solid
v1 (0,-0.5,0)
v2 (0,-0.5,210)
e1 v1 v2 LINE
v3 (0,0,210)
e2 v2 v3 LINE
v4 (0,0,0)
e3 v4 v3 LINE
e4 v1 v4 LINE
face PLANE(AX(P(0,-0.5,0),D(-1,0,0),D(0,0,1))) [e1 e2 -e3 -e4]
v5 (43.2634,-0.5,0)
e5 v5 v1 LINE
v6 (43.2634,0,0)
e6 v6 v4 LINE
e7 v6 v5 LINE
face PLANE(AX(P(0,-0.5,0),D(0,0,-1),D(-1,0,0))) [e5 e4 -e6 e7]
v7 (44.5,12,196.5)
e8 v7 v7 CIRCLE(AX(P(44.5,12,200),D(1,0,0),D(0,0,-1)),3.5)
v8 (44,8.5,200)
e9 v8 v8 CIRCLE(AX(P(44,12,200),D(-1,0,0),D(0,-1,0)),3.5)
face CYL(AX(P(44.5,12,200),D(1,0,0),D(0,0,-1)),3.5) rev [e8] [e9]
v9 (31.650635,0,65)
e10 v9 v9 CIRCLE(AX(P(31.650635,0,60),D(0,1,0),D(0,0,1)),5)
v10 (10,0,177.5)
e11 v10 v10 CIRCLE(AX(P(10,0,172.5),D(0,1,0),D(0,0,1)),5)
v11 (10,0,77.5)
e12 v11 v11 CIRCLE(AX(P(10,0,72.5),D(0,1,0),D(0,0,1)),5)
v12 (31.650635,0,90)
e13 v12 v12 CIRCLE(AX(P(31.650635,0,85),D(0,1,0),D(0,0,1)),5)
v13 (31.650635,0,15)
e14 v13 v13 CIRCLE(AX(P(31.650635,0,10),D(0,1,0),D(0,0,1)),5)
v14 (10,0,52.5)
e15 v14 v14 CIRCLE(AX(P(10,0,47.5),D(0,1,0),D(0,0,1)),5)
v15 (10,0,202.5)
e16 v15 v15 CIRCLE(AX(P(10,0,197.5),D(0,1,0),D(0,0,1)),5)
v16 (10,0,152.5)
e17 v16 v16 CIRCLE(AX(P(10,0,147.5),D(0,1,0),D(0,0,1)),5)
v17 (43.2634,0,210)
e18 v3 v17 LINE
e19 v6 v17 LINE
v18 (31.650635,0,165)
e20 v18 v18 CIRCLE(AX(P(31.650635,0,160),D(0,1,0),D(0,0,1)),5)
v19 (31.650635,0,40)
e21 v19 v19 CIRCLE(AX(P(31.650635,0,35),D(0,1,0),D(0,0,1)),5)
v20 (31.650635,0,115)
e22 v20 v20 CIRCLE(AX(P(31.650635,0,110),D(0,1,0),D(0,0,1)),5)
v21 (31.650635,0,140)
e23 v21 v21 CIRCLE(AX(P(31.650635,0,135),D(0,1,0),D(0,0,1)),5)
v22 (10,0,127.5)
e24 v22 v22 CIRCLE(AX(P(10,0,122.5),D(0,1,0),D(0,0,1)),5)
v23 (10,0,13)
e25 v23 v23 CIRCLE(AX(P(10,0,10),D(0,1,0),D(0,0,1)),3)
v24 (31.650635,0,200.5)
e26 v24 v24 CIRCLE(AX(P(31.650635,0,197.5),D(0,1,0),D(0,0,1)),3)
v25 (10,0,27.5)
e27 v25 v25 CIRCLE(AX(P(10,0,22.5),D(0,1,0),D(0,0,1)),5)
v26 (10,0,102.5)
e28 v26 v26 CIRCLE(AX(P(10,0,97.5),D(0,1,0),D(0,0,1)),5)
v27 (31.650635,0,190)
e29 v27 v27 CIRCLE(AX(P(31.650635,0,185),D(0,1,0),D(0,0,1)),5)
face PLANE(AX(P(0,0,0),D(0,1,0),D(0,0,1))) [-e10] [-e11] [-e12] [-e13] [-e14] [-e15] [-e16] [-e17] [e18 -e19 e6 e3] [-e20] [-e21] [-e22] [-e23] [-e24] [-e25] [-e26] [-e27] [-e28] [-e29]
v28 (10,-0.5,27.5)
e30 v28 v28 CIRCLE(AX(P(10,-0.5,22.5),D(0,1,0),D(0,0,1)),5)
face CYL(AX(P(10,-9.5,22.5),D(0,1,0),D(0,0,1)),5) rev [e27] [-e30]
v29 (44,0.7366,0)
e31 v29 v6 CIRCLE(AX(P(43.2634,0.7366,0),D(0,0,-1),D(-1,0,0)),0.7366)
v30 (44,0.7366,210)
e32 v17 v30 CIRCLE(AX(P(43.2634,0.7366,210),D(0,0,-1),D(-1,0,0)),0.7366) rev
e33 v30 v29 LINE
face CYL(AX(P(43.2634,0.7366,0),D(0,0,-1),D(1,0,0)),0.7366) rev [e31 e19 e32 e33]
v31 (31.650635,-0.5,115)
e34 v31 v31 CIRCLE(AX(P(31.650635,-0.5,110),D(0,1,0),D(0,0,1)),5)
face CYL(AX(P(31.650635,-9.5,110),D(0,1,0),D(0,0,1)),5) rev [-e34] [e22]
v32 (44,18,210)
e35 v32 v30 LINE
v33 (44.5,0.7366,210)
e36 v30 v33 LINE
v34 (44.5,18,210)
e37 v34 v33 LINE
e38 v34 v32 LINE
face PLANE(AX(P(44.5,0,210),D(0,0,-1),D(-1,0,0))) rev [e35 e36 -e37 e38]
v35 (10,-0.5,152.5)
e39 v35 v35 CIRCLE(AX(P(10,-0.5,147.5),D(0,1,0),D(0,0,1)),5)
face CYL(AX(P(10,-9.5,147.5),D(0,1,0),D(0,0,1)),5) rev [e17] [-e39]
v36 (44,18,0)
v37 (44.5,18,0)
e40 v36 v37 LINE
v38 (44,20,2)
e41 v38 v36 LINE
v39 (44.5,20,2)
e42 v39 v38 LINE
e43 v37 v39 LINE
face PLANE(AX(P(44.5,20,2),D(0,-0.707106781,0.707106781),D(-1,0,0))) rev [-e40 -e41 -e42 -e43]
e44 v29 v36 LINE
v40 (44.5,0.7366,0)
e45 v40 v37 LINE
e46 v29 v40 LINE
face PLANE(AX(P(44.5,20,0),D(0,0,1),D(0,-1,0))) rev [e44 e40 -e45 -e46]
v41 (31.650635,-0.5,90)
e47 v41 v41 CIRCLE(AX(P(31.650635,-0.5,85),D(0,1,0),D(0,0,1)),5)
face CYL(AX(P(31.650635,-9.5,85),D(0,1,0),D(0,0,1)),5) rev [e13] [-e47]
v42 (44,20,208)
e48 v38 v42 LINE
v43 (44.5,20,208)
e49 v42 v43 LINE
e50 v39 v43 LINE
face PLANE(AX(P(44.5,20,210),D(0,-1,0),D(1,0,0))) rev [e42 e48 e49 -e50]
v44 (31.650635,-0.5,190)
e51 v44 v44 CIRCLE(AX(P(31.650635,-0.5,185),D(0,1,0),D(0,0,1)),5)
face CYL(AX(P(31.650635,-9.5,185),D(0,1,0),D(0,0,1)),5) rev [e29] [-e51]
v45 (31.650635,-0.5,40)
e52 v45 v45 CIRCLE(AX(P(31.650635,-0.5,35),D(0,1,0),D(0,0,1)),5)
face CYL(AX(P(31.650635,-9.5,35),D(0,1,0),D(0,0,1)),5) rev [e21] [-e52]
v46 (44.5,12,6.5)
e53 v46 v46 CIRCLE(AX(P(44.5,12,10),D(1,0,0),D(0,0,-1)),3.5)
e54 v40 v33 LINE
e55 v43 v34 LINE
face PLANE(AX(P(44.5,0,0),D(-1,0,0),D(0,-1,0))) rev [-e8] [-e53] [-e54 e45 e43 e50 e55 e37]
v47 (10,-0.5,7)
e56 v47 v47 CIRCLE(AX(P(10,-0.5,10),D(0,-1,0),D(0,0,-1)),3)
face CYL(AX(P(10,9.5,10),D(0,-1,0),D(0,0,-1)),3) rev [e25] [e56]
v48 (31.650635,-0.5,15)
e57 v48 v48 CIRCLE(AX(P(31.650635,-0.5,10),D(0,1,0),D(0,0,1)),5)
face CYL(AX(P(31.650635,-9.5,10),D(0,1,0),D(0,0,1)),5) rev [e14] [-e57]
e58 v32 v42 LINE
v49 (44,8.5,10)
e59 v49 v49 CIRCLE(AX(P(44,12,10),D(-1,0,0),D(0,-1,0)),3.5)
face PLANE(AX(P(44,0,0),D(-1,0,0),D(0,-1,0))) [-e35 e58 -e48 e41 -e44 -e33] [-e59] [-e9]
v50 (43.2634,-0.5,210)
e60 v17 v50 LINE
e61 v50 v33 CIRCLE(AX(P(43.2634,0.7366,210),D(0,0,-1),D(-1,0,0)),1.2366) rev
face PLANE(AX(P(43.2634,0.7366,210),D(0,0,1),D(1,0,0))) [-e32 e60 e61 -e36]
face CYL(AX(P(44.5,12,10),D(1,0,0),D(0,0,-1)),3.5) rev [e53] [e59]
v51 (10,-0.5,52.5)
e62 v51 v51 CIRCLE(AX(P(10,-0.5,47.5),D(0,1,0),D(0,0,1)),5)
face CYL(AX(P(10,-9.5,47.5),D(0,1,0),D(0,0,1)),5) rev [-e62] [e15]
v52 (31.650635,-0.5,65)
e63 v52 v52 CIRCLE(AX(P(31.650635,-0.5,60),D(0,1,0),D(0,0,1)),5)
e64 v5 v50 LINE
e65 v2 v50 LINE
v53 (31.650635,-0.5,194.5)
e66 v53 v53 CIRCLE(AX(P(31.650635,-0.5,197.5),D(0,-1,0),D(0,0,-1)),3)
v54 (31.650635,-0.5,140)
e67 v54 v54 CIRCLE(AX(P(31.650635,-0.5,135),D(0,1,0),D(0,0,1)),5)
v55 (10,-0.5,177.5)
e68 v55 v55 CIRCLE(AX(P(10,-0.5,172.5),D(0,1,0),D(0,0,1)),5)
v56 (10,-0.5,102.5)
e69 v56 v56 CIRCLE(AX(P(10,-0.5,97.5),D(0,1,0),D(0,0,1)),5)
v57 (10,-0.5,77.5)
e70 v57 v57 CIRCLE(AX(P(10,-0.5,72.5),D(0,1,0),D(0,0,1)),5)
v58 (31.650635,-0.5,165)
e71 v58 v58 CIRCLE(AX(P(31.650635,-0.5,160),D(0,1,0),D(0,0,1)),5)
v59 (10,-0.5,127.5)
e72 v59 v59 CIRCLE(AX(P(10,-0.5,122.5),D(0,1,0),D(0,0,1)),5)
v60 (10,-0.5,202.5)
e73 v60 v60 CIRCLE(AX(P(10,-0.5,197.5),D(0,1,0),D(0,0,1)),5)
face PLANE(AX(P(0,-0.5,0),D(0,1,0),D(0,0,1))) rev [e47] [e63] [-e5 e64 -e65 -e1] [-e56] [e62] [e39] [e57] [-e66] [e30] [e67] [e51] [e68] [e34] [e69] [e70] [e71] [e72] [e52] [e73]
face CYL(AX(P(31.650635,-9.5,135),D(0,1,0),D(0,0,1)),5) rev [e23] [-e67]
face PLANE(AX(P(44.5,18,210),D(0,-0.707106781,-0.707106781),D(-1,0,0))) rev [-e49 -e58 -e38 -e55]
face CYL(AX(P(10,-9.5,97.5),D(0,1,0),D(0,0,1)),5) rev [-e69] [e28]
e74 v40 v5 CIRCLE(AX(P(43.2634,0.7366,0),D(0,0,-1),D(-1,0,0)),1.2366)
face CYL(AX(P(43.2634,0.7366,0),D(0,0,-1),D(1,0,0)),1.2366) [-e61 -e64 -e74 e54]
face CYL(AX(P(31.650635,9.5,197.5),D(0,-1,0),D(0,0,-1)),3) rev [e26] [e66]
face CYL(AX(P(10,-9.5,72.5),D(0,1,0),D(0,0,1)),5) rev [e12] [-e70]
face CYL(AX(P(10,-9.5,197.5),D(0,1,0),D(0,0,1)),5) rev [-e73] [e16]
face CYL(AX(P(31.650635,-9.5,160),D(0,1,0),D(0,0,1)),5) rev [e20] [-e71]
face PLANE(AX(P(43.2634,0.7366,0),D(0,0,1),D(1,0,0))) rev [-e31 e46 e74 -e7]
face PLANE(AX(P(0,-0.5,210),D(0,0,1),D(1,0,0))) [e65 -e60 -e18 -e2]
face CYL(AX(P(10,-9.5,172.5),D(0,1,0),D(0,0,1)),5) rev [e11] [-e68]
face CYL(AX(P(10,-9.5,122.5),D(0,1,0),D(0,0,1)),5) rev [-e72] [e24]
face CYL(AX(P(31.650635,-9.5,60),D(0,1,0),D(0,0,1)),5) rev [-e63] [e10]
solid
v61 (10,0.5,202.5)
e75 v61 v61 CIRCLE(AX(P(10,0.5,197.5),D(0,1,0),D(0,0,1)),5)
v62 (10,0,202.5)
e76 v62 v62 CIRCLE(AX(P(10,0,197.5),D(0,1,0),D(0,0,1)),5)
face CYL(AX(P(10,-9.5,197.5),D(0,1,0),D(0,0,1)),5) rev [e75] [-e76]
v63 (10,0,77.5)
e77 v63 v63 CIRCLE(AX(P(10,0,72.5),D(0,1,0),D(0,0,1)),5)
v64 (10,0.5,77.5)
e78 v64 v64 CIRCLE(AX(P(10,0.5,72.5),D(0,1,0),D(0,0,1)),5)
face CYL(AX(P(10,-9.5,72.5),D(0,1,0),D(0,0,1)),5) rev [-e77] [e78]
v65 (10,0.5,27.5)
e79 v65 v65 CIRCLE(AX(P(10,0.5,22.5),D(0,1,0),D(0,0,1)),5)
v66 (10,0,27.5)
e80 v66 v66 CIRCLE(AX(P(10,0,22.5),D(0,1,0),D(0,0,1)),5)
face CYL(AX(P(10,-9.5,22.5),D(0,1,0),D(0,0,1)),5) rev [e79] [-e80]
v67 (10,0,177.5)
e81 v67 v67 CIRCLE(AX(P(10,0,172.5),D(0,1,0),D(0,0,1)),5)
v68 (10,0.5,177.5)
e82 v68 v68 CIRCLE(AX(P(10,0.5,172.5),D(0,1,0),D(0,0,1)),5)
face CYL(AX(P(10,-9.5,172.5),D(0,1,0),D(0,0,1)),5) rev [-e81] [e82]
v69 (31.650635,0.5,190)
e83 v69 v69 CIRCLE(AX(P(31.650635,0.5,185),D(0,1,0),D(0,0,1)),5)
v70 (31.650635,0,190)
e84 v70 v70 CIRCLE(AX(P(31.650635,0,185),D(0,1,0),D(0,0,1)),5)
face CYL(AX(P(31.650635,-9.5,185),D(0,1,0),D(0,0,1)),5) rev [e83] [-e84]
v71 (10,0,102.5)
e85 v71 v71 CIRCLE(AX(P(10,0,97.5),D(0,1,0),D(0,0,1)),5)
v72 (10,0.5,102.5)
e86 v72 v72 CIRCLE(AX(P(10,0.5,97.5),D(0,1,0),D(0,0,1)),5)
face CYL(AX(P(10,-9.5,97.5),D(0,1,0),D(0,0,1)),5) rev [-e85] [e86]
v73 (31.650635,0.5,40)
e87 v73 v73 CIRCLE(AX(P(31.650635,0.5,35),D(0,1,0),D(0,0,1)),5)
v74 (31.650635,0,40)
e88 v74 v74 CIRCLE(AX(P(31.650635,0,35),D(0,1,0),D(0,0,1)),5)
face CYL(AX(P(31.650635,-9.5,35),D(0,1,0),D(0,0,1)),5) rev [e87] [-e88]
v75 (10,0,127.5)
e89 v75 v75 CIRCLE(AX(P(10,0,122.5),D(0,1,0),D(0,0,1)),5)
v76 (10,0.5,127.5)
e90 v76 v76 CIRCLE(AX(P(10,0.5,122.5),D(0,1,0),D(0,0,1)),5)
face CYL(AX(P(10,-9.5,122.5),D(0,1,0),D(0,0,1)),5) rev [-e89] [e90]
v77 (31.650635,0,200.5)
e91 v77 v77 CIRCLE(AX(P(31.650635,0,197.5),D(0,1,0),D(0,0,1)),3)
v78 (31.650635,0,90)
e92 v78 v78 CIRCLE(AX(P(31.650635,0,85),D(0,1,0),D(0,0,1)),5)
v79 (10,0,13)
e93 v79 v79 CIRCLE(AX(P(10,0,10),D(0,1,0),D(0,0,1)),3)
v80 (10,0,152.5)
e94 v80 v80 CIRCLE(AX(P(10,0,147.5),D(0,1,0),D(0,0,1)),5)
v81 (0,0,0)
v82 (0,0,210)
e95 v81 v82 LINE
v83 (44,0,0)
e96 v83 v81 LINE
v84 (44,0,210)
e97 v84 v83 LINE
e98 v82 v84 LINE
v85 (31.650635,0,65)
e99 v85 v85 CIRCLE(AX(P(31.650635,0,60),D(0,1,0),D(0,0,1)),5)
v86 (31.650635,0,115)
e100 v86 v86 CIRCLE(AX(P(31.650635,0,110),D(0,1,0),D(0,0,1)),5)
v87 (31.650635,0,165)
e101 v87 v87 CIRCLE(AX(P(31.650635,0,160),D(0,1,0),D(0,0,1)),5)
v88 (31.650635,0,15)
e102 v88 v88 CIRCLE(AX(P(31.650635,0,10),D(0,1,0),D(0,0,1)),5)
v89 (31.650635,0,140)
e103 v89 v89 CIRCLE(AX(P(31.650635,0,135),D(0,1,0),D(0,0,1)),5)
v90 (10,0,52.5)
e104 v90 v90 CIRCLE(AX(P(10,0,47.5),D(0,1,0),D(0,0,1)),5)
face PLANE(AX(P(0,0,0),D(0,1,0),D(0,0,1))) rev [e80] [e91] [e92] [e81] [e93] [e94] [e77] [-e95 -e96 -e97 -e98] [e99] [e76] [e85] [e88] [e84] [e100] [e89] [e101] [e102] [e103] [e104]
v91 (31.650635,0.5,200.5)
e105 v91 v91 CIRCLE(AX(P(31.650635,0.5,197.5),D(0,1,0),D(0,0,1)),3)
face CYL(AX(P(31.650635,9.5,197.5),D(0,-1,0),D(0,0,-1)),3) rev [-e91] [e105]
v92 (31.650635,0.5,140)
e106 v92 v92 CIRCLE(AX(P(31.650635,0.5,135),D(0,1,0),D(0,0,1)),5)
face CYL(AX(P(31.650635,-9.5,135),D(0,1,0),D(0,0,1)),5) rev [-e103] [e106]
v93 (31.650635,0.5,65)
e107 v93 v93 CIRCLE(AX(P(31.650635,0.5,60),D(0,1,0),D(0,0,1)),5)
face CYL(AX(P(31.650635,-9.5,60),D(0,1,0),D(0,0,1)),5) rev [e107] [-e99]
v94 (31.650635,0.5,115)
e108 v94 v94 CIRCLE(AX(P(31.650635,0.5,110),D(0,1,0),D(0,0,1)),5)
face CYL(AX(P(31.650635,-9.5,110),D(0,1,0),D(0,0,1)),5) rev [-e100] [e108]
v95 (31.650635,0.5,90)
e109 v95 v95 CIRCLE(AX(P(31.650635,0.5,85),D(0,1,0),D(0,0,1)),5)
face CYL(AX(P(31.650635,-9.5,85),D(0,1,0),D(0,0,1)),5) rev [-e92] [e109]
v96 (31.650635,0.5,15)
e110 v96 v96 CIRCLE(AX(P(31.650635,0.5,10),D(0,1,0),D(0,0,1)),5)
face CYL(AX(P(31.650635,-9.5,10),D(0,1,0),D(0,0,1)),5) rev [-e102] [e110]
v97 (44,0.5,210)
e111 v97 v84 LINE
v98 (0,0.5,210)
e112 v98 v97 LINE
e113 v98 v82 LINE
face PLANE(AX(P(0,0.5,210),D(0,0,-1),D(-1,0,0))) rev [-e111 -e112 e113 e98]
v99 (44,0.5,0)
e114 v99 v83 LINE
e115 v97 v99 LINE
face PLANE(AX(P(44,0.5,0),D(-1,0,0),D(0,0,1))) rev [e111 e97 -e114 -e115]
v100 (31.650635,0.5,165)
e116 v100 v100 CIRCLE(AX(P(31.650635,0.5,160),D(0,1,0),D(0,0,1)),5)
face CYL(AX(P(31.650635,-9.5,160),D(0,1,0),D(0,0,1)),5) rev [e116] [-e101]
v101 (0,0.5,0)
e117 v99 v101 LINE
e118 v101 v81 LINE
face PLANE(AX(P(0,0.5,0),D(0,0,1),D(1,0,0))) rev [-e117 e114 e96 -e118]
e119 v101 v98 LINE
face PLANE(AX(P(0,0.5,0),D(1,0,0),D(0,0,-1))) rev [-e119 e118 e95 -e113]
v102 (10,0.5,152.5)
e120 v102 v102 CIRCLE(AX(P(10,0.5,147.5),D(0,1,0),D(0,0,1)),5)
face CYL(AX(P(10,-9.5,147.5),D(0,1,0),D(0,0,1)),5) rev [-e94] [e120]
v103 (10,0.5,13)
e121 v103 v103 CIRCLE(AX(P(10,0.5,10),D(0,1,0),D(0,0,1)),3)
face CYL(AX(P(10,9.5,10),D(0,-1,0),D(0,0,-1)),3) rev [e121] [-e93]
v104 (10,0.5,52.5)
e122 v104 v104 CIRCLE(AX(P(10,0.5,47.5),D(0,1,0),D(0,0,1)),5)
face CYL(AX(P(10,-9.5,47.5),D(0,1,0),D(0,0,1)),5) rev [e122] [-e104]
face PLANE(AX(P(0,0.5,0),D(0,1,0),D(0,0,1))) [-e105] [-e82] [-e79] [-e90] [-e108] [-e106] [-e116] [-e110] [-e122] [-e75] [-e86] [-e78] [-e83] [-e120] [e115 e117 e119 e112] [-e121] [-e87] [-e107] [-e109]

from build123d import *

# Parameters (mm, degrees)
SKETCH1_W                         = 44
SKETCH1_H                         = 210
BOSS_EXTRUDE1_DEPTH               = 0.5
SKETCH1_3_W                       = 44
SKETCH1_3_H                       = 210
BASE_FLANGE1_DEPTH                = 0.5
SKETCH2_3_R                       = 5
CUT_EXTRUDE4_DEPTH                = 10
EDGE_FLANGE1_STRIP_W              = 3.4732
EDGE_FLANGE1_STRIP_H              = 0.5
EDGE_FLANGE1_STRIP_CUT_DEPTH      = 210
EDGE_FLANGE1_DEPTH                = 210
F_7_0_7_DIAMETER_HOLE1_AT_2_COUNT = 2
F_7_0_7_DIAMETER_HOLE1_AT_2_PITCH = 190
BREAK_CORNER1_START               = 12.727922061
BREAK_CORNER1_OUTLINE_W           = 3
BREAK_CORNER1_OUTLINE_H           = 150.220346111
BREAK_CORNER1_DEPTH               = 1.414213563
BREAK_CORNER1_START_2             = -135.764501988
BREAK_CORNER1_2_OUTLINE_W         = 3
BREAK_CORNER1_2_OUTLINE_H         = 1.779653889
BREAK_CORNER1_2_DEPTH             = 2.828427125
SKETCH13_R                        = 3
CUT_EXTRUDE5_DEPTH                = 10


# Read off the part's stored shape, not the designer's step: Break-Corner1
# Sheet-metal steps are written as plain solids
with BuildPart() as part:
    # Sketch1 → Boss-Extrude1 (new body)
    with BuildSketch(Plane(origin=(0, 0, 0), x_dir=(1, 0, 0), z_dir=(0, 1, 0))):
        with Locations((22, -105)):
            Rectangle(SKETCH1_W, SKETCH1_H)
    extrude(amount=BOSS_EXTRUDE1_DEPTH)


with BuildPart() as body_2:
    # Sketch1<3> → Base-Flange1 (new body)
    with BuildSketch(Plane(origin=(0, 0, 0), x_dir=(1, 0, 0), z_dir=(0, 1, 0))):
        with Locations((22, -105)):
            Rectangle(SKETCH1_3_W, SKETCH1_3_H)
    extrude(amount=-BASE_FLANGE1_DEPTH)


with BuildPart() as cut_extrude4_tool:
    # Sketch2<3> → Cut-Extrude4 (new body)
    with BuildSketch(Plane(origin=(0, 0.5, 0), x_dir=(1, 0, 0), z_dir=(0, 1, 0))):
        with Locations(Location((31.650635095, -10, 0), (0, 0, 270))):
            Circle(SKETCH2_3_R)
        with Locations(Location((10, -22.5, 0), (0, 0, 270))):
            Circle(SKETCH2_3_R)
        with Locations(Location((10, -47.5, 0), (0, 0, 270))):
            Circle(SKETCH2_3_R)
        with Locations(Location((31.650635095, -35, 0), (0, 0, 270))):
            Circle(SKETCH2_3_R)
        with Locations(Location((10, -72.5, 0), (0, 0, 270))):
            Circle(SKETCH2_3_R)
        with Locations(Location((31.650635095, -60, 0), (0, 0, 270))):
            Circle(SKETCH2_3_R)
        with Locations(Location((10, -97.5, 0), (0, 0, 270))):
            Circle(SKETCH2_3_R)
        with Locations(Location((31.650635095, -85, 0), (0, 0, 270))):
            Circle(SKETCH2_3_R)
        with Locations(Location((10, -122.5, 0), (0, 0, 270))):
            Circle(SKETCH2_3_R)
        with Locations(Location((31.650635095, -110, 0), (0, 0, 270))):
            Circle(SKETCH2_3_R)
        with Locations(Location((10, -147.5, 0), (0, 0, 270))):
            Circle(SKETCH2_3_R)
        with Locations(Location((31.650635095, -135, 0), (0, 0, 270))):
            Circle(SKETCH2_3_R)
        with Locations(Location((10, -172.5, 0), (0, 0, 270))):
            Circle(SKETCH2_3_R)
        with Locations(Location((31.650635095, -160, 0), (0, 0, 270))):
            Circle(SKETCH2_3_R)
        with Locations(Location((10, -197.5, 0), (0, 0, 270))):
            Circle(SKETCH2_3_R)
        with Locations(Location((31.650635095, -185, 0), (0, 0, 270))):
            Circle(SKETCH2_3_R)
    extrude(amount=-CUT_EXTRUDE4_DEPTH)


with BuildPart() as part_1:
    add(part.part)

    # Cut-Extrude4: cut by cut_extrude4_tool
    add(cut_extrude4_tool.part, mode=Mode.SUBTRACT)


with BuildPart() as body_2_1:
    add(body_2.part)

    # Cut-Extrude4: cut by cut_extrude4_tool
    add(cut_extrude4_tool.part, mode=Mode.SUBTRACT)

    # Edge-Flange1 strip (across the edge) → Edge-Flange1 strip cut (cut)
    with BuildSketch(Plane(origin=(44, 0, 210), x_dir=(-1, 0, 0), z_dir=(0, 0, -1))):
        with Locations((-1, -0.25)):
            Rectangle(EDGE_FLANGE1_STRIP_W, EDGE_FLANGE1_STRIP_H)
    extrude(amount=EDGE_FLANGE1_STRIP_CUT_DEPTH, mode=Mode.SUBTRACT)

    # Edge-Flange1 section (across the edge) → Edge-Flange1 (add)
    with BuildSketch(Plane(origin=(44, 0, 210), x_dir=(-1, 0, 0), z_dir=(0, 0, -1))):
        with BuildLine():
            Line((-0.5, 0.7366), (-0.5, 20))
            Line((-0.5, 20), (0, 20))
            Line((0, 20), (0, 0.7366))
            ThreePointArc((0, 0.7366), (0.215745145, 0.215745145), (0.7366, 0))
            Line((0.7366, 0), (0.7366, -0.5))
            ThreePointArc((0.7366, -0.5), (-0.137808246, -0.137808246), (-0.5, 0.7366))
        make_face()
    extrude(amount=EDGE_FLANGE1_DEPTH)

    # Sketch12 → Ø7.0 (7) Diameter Hole1 (revolve, cut)
    with BuildSketch(Plane(origin=(44.5, 12, 10), x_dir=(0, 0, -1), z_dir=(0, 1, 0))):
        Polygon((0, 0), (0, 17.103012167), (3.5, 15), (3.5, 0), align=None)
    f_7_0_7_diameter_hole1 = revolve(axis=Axis((50.85, 12, 10), (-1, 0, 0)), mode=Mode.SUBTRACT)

    # Ø7.0 (7) Diameter Hole1 at 2: Ø7.0 (7) Diameter Hole1 ×2
    with Locations(*[(0, 0, i * F_7_0_7_DIAMETER_HOLE1_AT_2_PITCH) for i in range(1, F_7_0_7_DIAMETER_HOLE1_AT_2_COUNT)]):
        add(f_7_0_7_diameter_hole1, mode=Mode.SUBTRACT)

    # Break-Corner1 outline → Break-Corner1 (cut)
    with BuildSketch(Plane(origin=(0, 0, 0), x_dir=(1, 0, 0), z_dir=(0, 0.707106781186549, -0.707106781186546)).offset(BREAK_CORNER1_START)):
        with Locations((44.5, -86.110173055)):
            Rectangle(BREAK_CORNER1_OUTLINE_W, BREAK_CORNER1_OUTLINE_H)
    extrude(amount=BREAK_CORNER1_DEPTH, mode=Mode.SUBTRACT)

    # Break-Corner1 2 outline → Break-Corner1 2 (cut)
    with BuildSketch(Plane(origin=(0, 0, 0), x_dir=(1, 0, 0), z_dir=(0, 0.707106781186549, -0.707106781186546)).offset(BREAK_CORNER1_START_2)):
        with Locations((44.5, -162.110173056)):
            Rectangle(BREAK_CORNER1_2_OUTLINE_W, BREAK_CORNER1_2_OUTLINE_H)
    extrude(amount=BREAK_CORNER1_2_DEPTH, mode=Mode.SUBTRACT)


with BuildPart() as cut_extrude5_tool:
    # Sketch13 → Cut-Extrude5 (new body)
    with BuildSketch(Plane.XZ.offset(0.5)):
        with Locations(Location((31.650635095, 197.5, 0), (0, 0, 270))):
            Circle(SKETCH13_R)
        with Locations(Location((10, 10, 0), (0, 0, 270))):
            Circle(SKETCH13_R)
    extrude(amount=-CUT_EXTRUDE5_DEPTH)


with BuildPart() as part_2:
    add(part_1.part)

    # Cut-Extrude5: cut by cut_extrude5_tool
    add(cut_extrude5_tool.part, mode=Mode.SUBTRACT)


with BuildPart() as body_2_2:
    add(body_2_1.part)

    # Cut-Extrude5: cut by cut_extrude5_tool
    add(cut_extrude5_tool.part, mode=Mode.SUBTRACT)


solid = Compound([part_2.part, body_2_2.part])
